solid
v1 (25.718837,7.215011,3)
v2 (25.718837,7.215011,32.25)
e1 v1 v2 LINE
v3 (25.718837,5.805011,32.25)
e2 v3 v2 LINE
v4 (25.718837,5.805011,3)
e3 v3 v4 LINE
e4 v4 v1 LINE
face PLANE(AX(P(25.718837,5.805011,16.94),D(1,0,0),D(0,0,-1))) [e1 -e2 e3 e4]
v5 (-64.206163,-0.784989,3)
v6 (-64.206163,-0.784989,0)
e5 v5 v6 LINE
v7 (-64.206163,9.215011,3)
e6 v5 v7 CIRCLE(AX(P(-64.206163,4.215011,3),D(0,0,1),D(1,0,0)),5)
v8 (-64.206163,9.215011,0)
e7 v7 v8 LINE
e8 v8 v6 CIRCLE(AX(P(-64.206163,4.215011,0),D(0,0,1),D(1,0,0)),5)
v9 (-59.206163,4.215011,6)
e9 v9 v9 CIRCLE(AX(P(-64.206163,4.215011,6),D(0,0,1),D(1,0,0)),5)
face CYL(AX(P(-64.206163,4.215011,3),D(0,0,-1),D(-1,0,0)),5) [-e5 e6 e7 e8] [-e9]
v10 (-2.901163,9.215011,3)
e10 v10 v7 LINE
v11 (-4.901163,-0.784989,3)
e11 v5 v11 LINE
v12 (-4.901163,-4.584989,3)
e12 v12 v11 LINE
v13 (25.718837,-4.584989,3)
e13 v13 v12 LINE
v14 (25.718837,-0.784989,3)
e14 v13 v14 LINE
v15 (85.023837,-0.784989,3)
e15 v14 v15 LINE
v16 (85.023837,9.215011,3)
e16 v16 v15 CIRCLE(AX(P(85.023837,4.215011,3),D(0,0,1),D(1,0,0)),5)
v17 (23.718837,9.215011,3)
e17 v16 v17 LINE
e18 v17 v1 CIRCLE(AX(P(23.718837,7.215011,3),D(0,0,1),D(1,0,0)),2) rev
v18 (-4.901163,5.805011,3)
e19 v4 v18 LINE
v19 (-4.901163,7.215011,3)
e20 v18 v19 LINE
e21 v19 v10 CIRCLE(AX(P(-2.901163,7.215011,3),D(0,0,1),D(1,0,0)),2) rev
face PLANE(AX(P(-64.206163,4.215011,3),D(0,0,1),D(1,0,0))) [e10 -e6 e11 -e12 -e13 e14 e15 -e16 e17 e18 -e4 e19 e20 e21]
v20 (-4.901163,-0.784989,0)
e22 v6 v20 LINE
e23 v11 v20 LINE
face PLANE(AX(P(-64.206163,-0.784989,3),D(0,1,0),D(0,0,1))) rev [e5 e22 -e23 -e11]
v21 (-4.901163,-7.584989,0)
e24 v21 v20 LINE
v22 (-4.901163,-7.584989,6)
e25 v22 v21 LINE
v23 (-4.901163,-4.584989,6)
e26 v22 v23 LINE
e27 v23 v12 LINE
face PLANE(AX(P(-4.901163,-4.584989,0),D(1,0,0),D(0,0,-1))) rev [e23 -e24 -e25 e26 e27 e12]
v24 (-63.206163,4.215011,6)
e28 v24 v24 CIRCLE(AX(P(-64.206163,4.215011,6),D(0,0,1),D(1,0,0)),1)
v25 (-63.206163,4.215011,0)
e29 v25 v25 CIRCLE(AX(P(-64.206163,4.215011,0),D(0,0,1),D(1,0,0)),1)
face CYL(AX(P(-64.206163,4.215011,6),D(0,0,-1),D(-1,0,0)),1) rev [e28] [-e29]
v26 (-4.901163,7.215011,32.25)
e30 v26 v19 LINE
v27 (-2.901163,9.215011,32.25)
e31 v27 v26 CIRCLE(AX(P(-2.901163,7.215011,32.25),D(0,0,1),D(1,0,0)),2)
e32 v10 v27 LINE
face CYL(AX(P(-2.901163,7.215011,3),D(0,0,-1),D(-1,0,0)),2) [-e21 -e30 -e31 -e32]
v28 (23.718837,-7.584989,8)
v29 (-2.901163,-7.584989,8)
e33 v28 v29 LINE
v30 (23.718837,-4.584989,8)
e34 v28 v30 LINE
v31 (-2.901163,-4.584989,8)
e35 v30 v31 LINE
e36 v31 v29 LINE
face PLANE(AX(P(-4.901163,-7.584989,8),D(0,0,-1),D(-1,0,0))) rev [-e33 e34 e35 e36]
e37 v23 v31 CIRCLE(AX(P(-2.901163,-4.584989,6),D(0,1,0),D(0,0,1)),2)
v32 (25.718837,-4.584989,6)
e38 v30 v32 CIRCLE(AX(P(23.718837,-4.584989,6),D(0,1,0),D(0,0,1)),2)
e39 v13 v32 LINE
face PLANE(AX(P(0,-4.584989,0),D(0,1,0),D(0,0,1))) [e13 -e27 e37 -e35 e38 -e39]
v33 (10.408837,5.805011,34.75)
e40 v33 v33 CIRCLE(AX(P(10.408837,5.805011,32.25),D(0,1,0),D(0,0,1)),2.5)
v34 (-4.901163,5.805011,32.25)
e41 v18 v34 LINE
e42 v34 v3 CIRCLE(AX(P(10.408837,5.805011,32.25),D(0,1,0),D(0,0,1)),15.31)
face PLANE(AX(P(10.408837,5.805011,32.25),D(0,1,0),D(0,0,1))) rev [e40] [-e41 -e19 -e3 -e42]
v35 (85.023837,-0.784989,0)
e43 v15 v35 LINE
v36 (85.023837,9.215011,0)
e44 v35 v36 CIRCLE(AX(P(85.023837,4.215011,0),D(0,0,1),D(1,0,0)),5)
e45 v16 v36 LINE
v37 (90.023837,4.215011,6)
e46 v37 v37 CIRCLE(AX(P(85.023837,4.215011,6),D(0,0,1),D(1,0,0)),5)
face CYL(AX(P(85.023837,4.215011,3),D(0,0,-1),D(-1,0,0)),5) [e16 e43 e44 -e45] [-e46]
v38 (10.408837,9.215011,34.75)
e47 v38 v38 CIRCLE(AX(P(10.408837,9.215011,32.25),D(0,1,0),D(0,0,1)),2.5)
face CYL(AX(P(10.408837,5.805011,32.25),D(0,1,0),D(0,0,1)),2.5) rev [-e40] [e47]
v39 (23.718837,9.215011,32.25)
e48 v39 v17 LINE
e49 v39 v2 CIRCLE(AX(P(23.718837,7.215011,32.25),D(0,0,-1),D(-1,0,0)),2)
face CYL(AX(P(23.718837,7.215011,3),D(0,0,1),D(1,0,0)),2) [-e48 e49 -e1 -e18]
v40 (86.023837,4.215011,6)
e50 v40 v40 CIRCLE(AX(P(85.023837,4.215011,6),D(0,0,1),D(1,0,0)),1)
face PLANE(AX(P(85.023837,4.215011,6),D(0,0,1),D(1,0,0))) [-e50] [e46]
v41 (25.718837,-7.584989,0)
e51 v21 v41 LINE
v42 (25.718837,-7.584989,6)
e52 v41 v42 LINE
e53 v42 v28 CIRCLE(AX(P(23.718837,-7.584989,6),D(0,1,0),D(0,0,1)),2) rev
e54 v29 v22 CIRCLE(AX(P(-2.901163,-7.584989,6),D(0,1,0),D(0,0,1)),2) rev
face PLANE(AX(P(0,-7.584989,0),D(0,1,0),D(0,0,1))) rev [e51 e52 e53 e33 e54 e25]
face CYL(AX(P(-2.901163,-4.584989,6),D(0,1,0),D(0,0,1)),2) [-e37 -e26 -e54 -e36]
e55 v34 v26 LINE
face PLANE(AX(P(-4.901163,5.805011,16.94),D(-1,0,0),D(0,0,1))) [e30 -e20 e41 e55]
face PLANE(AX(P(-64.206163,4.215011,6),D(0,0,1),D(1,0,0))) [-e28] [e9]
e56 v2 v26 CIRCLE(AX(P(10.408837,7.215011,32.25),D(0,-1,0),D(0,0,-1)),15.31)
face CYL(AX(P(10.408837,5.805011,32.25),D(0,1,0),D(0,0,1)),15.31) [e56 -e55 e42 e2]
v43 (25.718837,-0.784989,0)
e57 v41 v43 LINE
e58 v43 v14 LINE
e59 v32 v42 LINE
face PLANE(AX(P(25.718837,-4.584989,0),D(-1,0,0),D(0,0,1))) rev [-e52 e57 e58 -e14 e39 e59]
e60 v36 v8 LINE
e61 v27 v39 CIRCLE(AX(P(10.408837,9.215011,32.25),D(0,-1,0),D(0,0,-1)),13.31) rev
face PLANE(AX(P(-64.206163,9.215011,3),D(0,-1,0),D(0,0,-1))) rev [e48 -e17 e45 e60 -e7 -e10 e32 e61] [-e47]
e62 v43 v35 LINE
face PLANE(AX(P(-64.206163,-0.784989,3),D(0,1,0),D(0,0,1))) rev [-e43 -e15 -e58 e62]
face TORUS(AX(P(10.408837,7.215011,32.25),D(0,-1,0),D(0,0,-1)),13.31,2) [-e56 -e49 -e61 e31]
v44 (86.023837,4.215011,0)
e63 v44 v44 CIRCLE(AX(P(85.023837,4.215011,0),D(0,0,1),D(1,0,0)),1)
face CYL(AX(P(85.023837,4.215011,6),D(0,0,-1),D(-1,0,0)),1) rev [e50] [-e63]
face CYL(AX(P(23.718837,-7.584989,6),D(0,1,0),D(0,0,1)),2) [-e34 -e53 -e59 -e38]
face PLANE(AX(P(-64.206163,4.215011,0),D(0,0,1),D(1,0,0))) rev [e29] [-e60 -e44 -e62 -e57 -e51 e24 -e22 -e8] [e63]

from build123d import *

# Parameters (mm, degrees)
BOSS_EXTRUDE1_DEPTH = 3
SKETCH2_R           = 5
SKETCH2_R_2         = 1
BOSS_EXTRUDE2_DEPTH = 3
CUT_EXTRUDE1_START  = -10
SKETCH7_R           = 1
CUT_EXTRUDE1_DEPTH  = 10
CUT_EXTRUDE2_START  = -10
SKETCH8_R           = 1
CUT_EXTRUDE2_DEPTH  = 10
SKETCH5_R           = 2.5
BOSS_EXTRUDE3_DEPTH = 3.41
SKETCH9_W           = 30.62
SKETCH9_H           = 3
BOSS_EXTRUDE4_DEPTH = 3.8
SKETCH10_W          = 30.62
SKETCH10_H          = 8
BOSS_EXTRUDE5_DEPTH = 3
FILLET3_R           = 2


with BuildPart() as part:
    # Sketch1 → Boss-Extrude1 (new body)
    with BuildSketch(Plane.XY):
        with BuildLine():
            Line((-64.206162528, 9.215011287), (85.023837472, 9.215011287))
            ThreePointArc((85.023837472, 9.215011287), (90.023837472, 4.215011287), (85.023837472, -0.784988713))
            Line((85.023837472, -0.784988713), (-64.206162528, -0.784988713))
            ThreePointArc((-64.206162528, -0.784988713), (-69.206162528, 4.215011287), (-64.206162528, 9.215011287))
        make_face()
    extrude(amount=BOSS_EXTRUDE1_DEPTH)

    # Sketch2 → Boss-Extrude2 (add)
    # profile 1 of 2: a face of its own
    with BuildSketch(Plane.XY.offset(3)):
        with Locations(Location((-64.206162528, 4.215011287, 0), (0, 0, 270))):
            Circle(SKETCH2_R)
        with Locations((-64.206162528, 4.215011287)):
            Circle(SKETCH2_R_2, mode=Mode.SUBTRACT)
    # profile 2 of 2: a face of its own
    with BuildSketch(Plane.XY.offset(3)):
        with Locations(Location((85.023837472, 4.215011287, 0), (0, 0, 90))):
            Circle(SKETCH2_R)
        with Locations((85.023837472, 4.215011287)):
            Circle(SKETCH2_R_2, mode=Mode.SUBTRACT)
    extrude(amount=BOSS_EXTRUDE2_DEPTH)

    # Sketch7 → Cut-Extrude1 (cut)
    with BuildSketch(Plane.XY.offset(6).offset(CUT_EXTRUDE1_START)):
        with Locations((-64.206162528, 4.215011287)):
            Circle(SKETCH7_R)
    extrude(amount=CUT_EXTRUDE1_DEPTH, mode=Mode.SUBTRACT)

    # Sketch8 → Cut-Extrude2 (cut)
    with BuildSketch(Plane.XY.offset(6).offset(CUT_EXTRUDE2_START)):
        with Locations((85.023837472, 4.215011287)):
            Circle(SKETCH8_R)
    extrude(amount=CUT_EXTRUDE2_DEPTH, mode=Mode.SUBTRACT)

    # Sketch5 → Boss-Extrude3 (add)
    with BuildSketch(Plane(origin=(0, 9.215011287, 0), x_dir=(1, 0, 0), z_dir=(0, 1, 0))):
        with BuildLine():
            Line((-4.901162528, -3), (25.718837472, -3))
            Line((25.718837472, -3), (25.718837472, -16.94))
            Line((25.718837472, -16.94), (25.718837472, -32.25))
            ThreePointArc((25.718837472, -32.25), (10.408837472, -47.56), (-4.901162528, -32.25))
            Line((-4.901162528, -32.25), (-4.901162528, -16.94))
            Line((-4.901162528, -16.94), (-4.901162528, -3))
        make_face()
        with Locations(Location((10.408837472, -32.25, 0), (0, 0, 270))):
            Circle(SKETCH5_R, mode=Mode.SUBTRACT)
    extrude(amount=-BOSS_EXTRUDE3_DEPTH)

    # Sketch9 → Boss-Extrude4 (add)
    with BuildSketch(Plane.XZ.offset(0.784988713)):
        with Locations((10.408837472, 1.5)):
            Rectangle(SKETCH9_W, SKETCH9_H)
    extrude(amount=BOSS_EXTRUDE4_DEPTH)

    # Sketch10 → Boss-Extrude5 (add)
    with BuildSketch(Plane.XZ.offset(4.584988713)):
        with Locations((10.408837472, 4)):
            Rectangle(SKETCH10_W, SKETCH10_H)
    extrude(amount=BOSS_EXTRUDE5_DEPTH)

    # Fillet3
    # the kernel refuses this fillet: 2 mm, written as the material it takes off along each edge
    with BuildSketch(Plane(origin=(25.718837472, 9.215011287, 3), x_dir=(-1, 0, 0), z_dir=(0, 0, 1)), Plane(origin=(-4.901162528, 9.215011287, 32.25), x_dir=(1, 0, 0), z_dir=(0, 0, -1))) as fillet3_piece_1:
        with BuildLine():
            CenterArc((FILLET3_R, FILLET3_R), FILLET3_R, 180, 90)
            Line((0, FILLET3_R), (0, 0))
            Line((0, 0), (FILLET3_R, 0))
        make_face()
    extrude(amount=29.25, mode=Mode.SUBTRACT)
    with BuildSketch(Plane(origin=(10.408837472, 9.215011287, 32.25), x_dir=(1, 0, 0), z_dir=(0, 0, -1))) as fillet3_piece_2:
        with BuildLine():
            CenterArc((15.31 - FILLET3_R, FILLET3_R), FILLET3_R, 270, 90)
            Line((15.31, FILLET3_R), (15.31, 0))
            Line((15.31, 0), (15.31 - FILLET3_R, 0))
        make_face()
    revolve(axis=Axis((10.408837472, 9.215011287, 32.25), (0, -1, 0)), revolution_arc=180, mode=Mode.SUBTRACT)
    with BuildSketch(Plane(origin=(-4.901162528, 0.415011287, 8), x_dir=(0, 0, -1), z_dir=(0, -1, 0)), Plane(origin=(25.718837472, 0.415011287, 8), x_dir=(-1, 0, 0), z_dir=(0, -1, 0))) as fillet3_piece_3:
        with BuildLine():
            CenterArc((FILLET3_R, FILLET3_R), FILLET3_R, 180, 90)
            Line((0, FILLET3_R), (0, 0))
            Line((0, 0), (FILLET3_R, 0))
        make_face()
    extrude(amount=13, mode=Mode.SUBTRACT)


solid = part.part
